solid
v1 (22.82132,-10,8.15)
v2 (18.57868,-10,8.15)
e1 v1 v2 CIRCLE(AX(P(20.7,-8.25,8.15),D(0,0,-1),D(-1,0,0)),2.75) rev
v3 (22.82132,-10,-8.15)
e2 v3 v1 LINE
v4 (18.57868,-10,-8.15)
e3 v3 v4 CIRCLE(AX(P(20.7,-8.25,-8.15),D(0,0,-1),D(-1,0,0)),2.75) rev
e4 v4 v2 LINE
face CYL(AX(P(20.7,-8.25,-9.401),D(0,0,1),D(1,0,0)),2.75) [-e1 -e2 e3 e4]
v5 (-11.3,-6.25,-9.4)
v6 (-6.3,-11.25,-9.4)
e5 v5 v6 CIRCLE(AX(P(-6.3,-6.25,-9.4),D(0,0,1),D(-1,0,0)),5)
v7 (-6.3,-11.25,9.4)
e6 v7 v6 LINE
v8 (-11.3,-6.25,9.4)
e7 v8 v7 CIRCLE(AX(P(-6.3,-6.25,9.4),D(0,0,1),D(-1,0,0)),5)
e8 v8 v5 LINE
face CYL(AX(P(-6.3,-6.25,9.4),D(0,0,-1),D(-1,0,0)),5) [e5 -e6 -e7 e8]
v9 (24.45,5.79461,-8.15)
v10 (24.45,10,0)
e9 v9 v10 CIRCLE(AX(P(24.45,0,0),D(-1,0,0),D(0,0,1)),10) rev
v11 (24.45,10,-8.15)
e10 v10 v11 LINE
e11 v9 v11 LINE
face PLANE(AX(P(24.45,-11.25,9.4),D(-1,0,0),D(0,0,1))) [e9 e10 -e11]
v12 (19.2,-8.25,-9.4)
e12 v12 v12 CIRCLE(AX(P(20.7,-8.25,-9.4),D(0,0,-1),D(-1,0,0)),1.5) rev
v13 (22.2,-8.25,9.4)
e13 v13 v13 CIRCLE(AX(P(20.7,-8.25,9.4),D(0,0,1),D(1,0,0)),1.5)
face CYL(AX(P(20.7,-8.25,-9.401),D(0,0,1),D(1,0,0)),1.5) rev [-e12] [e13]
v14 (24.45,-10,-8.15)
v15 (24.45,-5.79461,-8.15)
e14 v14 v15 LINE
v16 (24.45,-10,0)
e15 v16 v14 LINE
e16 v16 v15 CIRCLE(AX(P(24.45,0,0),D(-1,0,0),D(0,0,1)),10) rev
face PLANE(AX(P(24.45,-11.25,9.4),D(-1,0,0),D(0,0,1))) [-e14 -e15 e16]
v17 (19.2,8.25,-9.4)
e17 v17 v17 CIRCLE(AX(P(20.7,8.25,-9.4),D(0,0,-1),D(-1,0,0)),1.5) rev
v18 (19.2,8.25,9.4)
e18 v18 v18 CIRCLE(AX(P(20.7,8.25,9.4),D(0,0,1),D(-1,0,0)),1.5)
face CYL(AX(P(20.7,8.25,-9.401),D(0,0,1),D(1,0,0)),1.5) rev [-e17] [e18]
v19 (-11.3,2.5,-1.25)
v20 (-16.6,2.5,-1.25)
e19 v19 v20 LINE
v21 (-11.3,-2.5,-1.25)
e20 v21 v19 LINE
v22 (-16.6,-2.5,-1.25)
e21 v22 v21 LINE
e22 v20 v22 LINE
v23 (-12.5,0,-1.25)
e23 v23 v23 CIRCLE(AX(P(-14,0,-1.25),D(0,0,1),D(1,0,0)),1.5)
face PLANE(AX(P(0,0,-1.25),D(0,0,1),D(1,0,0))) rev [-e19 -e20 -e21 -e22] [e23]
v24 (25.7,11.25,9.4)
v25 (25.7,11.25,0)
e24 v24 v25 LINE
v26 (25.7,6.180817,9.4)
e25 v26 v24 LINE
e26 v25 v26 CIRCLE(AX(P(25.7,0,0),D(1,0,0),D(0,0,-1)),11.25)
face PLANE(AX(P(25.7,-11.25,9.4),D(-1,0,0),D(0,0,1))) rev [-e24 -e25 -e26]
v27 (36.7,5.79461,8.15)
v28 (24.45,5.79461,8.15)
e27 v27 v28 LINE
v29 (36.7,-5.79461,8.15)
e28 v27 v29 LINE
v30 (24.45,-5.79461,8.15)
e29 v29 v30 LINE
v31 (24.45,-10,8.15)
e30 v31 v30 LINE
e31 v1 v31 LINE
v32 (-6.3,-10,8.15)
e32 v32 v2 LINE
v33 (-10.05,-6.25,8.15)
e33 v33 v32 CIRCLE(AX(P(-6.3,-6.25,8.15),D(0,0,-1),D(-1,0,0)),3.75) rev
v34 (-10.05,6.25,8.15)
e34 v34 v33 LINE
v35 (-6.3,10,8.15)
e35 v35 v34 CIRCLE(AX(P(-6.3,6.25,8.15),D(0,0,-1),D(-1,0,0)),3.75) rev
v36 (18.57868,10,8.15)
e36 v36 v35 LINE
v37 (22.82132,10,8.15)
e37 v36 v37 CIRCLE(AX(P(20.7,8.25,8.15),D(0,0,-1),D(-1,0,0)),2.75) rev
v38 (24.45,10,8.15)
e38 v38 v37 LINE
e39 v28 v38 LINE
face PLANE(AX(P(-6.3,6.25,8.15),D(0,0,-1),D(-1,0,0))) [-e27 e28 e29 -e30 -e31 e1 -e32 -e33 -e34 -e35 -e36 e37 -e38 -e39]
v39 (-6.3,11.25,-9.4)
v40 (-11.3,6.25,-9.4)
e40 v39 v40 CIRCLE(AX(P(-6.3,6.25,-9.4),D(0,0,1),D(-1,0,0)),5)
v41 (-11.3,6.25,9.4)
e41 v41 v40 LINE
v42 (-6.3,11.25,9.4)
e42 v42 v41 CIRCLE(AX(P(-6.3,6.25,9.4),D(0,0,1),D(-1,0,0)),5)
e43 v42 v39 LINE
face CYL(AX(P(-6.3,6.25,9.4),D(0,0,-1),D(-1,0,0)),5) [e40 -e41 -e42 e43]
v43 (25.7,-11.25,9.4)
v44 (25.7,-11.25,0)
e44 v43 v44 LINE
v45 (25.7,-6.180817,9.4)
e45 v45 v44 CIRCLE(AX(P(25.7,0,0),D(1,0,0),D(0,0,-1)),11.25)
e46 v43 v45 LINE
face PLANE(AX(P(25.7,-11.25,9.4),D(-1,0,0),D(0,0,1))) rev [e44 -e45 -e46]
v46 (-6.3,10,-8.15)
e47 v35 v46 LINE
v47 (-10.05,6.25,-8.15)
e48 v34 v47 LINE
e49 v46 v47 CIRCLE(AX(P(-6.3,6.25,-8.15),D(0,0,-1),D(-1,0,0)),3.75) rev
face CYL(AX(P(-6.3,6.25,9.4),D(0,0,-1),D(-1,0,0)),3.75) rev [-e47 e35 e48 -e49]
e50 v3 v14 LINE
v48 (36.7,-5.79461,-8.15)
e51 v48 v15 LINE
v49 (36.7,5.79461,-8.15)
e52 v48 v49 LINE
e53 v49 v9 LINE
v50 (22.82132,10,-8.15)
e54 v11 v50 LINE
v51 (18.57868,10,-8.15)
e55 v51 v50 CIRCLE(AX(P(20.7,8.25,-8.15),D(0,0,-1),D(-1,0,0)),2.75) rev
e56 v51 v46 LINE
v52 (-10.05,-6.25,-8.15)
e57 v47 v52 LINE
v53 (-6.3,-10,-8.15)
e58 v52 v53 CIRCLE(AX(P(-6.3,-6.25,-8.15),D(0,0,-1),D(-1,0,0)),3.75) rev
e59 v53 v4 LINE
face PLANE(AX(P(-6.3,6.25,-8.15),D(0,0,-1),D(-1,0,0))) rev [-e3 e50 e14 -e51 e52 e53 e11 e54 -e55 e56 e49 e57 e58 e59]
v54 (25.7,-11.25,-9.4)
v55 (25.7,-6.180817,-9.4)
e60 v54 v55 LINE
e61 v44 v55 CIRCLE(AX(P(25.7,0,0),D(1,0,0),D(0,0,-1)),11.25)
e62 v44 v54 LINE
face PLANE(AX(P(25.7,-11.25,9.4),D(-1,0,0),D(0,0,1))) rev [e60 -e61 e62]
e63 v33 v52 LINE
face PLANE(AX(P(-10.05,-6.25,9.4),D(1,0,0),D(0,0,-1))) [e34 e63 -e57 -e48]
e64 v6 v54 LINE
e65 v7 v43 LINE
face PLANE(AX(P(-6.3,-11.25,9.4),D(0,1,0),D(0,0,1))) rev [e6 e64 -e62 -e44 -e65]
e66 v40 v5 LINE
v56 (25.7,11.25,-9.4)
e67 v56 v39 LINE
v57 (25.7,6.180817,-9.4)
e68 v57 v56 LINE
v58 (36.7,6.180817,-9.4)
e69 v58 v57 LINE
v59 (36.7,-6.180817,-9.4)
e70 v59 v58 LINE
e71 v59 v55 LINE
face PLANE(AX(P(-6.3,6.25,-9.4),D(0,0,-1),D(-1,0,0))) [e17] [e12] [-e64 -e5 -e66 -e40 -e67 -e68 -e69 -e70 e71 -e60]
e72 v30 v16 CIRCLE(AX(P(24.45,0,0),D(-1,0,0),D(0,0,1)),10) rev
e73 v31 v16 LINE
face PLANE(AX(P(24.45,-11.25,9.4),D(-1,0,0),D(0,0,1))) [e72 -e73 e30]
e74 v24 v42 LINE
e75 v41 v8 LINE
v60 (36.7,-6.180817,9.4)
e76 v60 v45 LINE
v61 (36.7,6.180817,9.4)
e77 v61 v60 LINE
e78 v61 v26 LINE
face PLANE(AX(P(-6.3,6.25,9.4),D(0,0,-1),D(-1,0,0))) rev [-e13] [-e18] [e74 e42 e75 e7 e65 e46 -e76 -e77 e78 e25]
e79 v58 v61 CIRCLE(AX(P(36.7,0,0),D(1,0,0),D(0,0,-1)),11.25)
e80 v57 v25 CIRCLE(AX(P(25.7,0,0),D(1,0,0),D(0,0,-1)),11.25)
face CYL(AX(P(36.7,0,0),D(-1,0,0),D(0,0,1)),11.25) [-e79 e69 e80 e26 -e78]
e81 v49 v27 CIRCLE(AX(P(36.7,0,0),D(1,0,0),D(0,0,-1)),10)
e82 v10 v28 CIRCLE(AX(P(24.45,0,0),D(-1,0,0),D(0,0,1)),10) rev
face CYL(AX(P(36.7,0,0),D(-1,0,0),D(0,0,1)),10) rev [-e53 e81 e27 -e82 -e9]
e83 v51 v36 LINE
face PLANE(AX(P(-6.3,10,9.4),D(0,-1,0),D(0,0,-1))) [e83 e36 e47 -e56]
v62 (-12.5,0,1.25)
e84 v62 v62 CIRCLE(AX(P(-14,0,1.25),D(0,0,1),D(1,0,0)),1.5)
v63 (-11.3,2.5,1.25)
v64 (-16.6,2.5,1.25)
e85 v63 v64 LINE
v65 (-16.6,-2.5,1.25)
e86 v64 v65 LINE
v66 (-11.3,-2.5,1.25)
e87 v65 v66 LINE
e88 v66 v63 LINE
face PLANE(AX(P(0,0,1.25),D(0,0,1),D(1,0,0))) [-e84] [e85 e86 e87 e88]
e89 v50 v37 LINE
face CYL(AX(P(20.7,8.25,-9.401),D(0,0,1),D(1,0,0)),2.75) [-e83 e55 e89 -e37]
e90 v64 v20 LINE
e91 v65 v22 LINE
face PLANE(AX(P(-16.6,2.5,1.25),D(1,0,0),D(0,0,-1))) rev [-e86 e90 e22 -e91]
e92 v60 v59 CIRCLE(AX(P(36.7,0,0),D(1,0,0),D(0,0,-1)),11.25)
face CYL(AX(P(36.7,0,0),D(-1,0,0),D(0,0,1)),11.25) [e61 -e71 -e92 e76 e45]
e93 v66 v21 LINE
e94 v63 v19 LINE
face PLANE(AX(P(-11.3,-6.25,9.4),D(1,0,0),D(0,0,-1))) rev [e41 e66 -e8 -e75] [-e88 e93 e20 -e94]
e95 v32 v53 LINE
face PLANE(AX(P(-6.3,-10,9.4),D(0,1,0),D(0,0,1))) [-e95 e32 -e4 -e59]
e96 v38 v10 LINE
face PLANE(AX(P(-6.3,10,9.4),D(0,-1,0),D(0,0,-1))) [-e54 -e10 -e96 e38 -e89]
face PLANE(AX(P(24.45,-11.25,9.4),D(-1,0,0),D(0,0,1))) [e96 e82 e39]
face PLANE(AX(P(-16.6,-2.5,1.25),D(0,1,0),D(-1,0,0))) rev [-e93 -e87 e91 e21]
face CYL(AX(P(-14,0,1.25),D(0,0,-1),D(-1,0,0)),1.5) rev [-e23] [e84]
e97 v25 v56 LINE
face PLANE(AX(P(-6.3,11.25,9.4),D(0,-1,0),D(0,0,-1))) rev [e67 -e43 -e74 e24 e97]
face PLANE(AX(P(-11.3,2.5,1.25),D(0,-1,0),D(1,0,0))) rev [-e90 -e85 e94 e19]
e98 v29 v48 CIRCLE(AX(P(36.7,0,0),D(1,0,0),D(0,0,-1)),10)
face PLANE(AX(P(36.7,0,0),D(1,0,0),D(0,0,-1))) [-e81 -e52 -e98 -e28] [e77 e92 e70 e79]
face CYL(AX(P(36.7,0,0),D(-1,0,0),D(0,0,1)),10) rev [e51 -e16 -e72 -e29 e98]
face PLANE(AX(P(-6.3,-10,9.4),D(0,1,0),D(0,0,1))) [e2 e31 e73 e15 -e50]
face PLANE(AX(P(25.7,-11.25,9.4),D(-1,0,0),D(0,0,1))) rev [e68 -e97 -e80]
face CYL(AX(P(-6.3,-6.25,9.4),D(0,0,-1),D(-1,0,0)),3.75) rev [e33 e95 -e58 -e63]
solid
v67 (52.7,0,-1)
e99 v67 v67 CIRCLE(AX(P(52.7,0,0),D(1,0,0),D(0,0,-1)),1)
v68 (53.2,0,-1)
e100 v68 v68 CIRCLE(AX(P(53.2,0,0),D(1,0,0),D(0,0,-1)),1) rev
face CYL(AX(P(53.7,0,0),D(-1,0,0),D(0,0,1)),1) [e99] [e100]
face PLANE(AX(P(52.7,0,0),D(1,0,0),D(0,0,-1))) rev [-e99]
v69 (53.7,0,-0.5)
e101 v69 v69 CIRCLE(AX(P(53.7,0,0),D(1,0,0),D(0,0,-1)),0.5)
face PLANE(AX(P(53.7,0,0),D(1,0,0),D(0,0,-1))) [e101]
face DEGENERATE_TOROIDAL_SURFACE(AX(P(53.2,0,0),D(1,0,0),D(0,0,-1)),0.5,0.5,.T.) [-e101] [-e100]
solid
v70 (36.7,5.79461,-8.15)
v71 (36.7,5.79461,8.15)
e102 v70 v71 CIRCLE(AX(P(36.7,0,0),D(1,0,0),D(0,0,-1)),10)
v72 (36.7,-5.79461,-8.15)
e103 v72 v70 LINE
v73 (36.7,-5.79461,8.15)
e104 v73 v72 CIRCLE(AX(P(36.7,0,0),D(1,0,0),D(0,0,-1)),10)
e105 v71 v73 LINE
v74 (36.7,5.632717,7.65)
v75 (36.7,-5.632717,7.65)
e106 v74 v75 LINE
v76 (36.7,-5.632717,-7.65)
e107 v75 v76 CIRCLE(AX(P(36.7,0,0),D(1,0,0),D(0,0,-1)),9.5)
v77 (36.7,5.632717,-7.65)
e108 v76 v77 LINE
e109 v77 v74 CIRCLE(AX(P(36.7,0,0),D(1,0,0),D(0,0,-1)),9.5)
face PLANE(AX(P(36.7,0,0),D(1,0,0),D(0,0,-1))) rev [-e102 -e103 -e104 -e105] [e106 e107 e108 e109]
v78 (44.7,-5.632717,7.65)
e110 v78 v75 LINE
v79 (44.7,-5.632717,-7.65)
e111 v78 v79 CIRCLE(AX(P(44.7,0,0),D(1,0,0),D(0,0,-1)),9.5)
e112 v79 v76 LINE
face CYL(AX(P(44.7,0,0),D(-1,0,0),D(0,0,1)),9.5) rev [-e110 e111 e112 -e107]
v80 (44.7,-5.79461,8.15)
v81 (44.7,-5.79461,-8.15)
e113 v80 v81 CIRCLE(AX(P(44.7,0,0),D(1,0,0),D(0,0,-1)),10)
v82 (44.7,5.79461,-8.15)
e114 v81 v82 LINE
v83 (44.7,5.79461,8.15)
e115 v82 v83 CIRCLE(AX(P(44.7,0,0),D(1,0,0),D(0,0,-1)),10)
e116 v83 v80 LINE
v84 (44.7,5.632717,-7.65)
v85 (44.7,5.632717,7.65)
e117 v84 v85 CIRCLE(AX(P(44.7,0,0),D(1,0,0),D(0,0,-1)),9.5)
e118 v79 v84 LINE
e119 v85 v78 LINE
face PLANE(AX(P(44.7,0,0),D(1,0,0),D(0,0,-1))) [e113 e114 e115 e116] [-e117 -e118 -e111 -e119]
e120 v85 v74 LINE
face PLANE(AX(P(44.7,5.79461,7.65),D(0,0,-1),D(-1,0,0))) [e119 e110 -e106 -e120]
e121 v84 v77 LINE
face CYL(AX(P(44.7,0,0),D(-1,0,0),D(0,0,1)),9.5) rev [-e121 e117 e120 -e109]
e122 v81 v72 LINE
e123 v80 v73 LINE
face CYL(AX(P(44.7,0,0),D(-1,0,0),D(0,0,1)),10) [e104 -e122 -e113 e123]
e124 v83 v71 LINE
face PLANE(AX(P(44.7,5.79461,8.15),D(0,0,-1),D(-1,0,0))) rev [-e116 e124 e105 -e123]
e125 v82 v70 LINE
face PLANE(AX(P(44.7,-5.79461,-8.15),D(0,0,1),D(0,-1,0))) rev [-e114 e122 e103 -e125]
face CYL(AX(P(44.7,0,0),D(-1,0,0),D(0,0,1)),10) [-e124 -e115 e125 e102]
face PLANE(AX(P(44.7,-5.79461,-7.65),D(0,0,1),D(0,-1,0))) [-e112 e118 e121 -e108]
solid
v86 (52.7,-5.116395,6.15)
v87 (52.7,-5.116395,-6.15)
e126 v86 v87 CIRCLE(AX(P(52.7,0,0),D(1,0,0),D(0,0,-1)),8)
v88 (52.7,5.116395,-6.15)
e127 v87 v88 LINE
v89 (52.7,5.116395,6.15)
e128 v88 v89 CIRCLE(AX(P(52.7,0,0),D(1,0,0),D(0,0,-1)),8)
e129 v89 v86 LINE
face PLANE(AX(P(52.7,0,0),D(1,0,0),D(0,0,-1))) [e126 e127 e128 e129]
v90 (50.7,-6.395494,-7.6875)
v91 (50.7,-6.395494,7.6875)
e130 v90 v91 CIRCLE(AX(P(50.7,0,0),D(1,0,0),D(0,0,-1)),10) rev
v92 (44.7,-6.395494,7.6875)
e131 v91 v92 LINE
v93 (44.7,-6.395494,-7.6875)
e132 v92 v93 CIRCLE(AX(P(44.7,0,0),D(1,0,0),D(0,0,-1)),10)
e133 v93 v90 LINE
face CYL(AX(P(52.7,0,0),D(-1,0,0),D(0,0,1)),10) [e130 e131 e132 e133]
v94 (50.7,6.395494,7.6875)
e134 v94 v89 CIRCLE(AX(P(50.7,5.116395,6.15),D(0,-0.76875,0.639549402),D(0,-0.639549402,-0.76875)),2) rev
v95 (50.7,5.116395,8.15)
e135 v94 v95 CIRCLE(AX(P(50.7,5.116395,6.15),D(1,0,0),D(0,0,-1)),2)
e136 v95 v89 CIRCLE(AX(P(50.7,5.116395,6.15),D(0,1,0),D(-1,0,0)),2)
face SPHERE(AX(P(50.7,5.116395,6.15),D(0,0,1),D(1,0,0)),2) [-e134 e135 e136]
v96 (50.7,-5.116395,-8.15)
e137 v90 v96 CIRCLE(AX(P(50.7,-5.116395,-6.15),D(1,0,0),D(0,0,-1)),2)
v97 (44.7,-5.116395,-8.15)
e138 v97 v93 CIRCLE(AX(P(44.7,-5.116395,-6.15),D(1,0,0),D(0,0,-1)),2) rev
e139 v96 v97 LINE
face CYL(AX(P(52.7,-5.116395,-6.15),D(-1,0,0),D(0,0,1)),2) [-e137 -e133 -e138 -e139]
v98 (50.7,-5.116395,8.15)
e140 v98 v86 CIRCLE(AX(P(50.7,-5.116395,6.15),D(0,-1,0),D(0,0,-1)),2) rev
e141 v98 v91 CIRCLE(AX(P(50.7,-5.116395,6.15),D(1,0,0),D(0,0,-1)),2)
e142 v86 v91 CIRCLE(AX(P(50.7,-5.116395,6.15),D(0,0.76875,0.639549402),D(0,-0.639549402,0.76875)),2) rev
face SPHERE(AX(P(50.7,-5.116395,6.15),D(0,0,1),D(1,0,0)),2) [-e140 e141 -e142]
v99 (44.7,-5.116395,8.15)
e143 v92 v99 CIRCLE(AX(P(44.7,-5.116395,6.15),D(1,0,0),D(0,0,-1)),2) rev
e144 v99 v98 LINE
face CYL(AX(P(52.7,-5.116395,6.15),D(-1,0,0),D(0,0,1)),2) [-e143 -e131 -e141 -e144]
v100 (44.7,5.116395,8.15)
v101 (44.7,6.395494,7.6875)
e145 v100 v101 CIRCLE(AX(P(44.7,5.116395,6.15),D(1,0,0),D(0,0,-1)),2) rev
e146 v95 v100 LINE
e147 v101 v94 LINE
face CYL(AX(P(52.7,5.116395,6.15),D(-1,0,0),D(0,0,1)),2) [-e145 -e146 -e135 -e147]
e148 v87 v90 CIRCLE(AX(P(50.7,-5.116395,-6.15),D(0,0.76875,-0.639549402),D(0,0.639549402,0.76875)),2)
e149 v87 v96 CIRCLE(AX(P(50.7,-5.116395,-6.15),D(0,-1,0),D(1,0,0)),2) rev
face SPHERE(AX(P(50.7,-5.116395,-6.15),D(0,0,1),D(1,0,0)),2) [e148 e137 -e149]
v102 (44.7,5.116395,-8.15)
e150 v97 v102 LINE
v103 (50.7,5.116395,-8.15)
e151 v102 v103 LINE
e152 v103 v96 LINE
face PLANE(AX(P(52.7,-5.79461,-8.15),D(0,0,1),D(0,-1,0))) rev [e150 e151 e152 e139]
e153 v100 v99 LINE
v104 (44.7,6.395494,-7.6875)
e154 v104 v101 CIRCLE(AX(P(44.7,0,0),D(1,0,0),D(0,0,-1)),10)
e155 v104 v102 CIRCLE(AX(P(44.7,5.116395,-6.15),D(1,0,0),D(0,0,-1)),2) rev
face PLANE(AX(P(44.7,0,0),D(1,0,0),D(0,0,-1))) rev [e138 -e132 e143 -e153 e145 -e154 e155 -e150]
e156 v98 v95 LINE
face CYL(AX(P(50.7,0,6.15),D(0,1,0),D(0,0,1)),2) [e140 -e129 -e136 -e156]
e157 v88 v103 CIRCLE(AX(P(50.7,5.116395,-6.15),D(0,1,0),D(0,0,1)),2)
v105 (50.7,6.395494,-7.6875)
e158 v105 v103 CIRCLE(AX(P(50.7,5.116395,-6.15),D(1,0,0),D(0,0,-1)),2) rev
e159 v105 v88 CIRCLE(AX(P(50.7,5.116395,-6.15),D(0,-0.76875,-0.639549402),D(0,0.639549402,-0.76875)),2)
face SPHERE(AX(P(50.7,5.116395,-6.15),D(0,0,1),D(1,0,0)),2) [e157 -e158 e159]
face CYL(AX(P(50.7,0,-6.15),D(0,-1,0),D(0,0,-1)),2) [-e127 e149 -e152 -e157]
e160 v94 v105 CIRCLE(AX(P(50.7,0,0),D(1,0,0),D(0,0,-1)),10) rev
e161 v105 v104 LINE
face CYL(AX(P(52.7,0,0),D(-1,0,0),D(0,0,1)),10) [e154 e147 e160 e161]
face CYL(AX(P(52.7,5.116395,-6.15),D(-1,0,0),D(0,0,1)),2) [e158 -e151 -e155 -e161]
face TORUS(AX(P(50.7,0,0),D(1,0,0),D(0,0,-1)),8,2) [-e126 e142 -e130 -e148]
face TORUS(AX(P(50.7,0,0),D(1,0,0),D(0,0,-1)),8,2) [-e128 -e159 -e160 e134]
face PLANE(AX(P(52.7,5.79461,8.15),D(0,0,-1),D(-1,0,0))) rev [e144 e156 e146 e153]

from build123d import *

# Parameters (mm, degrees)
YELLOW_BODY_DEPTH  = 9.4
SKETCH8_W          = 5.3
SKETCH8_H          = 5
SKETCH8_R          = 1.5
LUG_DEPTH          = 1.25
HOLES_REACH        = 35.771
SKETCH9_R          = 1.5
MOTOR_SOCKET_DEPTH = 11
SHELL1_START       = -6.3
SHELL1_OUTLINE_W   = 20
SHELL1_OUTLINE_H   = 16.3
SHELL1_DEPTH       = 24.25
SHELL1_START_2     = 23.45
SHELL1_2_DEPTH     = 13.25
SHELL1_3_DEPTH     = 1
SHELL1_START_3     = -8.15
SHELL1_4_DEPTH     = 16.3
MOTOR_BODY_DEPTH   = 8
MOTOR_END_DEPTH    = 8
FILLET1_R          = 2
SKETCH5_R          = 1
MOTOR_SHAFT_DEPTH  = 1
FILLET2_R          = 0.5


with BuildPart() as part:
    # Sketch1 → Yellow Body (new, symmetric)
    with BuildSketch(Plane.XY):
        with BuildLine():
            Line((-6.3, -11.25), (25.7, -11.25))
            Line((25.7, -11.25), (25.7, 11.25))
            Line((25.7, 11.25), (-6.3, 11.25))
            ThreePointArc((-6.3, 11.25), (-9.835534, 9.785534), (-11.3, 6.25))
            Line((-11.3, 6.25), (-11.3, -6.25))
            ThreePointArc((-11.3, -6.25), (-9.835534, -9.785534), (-6.3, -11.25))
        make_face()
    extrude(amount=YELLOW_BODY_DEPTH, both=True)

    # Sketch8 → Lug (add, symmetric)
    with BuildSketch(Plane.XY):
        with Locations((-13.95, 0)):
            Rectangle(SKETCH8_W, SKETCH8_H)
        with Locations((-14, 0)):
            Circle(SKETCH8_R, mode=Mode.SUBTRACT)
    extrude(amount=LUG_DEPTH, both=True)

    # Sketch9 → Holes (cut, up to next)
    with BuildSketch(Plane.XY.offset(9.4), mode=Mode.PRIVATE) as holes_sk1:
        with Locations((20.7, -8.25)):
            Circle(SKETCH9_R)
    holes_tool1 = extrude(holes_sk1.sketch, amount=-HOLES_REACH, mode=Mode.PRIVATE) & part.part
    # Sketch9 → Holes (cut, up to next)
    with BuildSketch(Plane.XY.offset(9.4), mode=Mode.PRIVATE) as holes_sk2:
        with Locations(Location((20.7, 8.25, 0), (0, 0, 180))):
            Circle(SKETCH9_R)
    holes_tool2 = extrude(holes_sk2.sketch, amount=-HOLES_REACH, mode=Mode.PRIVATE) & part.part
    add(holes_tool1.solids().sort_by_distance((20.7, -8.25, 9.4))[0], mode=Mode.SUBTRACT)
    add(holes_tool2.solids().sort_by_distance((20.7, 8.25, 9.4))[0], mode=Mode.SUBTRACT)

    # Sketch2 → Motor Socket (add)
    with BuildSketch(Plane(origin=(25.7, 0, 0), x_dir=(0, 0, -1), z_dir=(1, 0, 0))):
        with BuildLine():
            Line((9.4, -6.180817), (9.4, 6.180817))
            ThreePointArc((9.4, 6.180817), (0, 11.25), (-9.4, 6.180817))
            Line((-9.4, 6.180817), (-9.4, -6.180817))
            ThreePointArc((-9.4, -6.180817), (0, -11.25), (9.4, -6.180817))
        make_face()
    extrude(amount=MOTOR_SOCKET_DEPTH)

    # Shell1: read off the stored shape, not the designer's step
    # Shell1 outline → Shell1 (cut)
    with BuildSketch(Plane.YZ.offset(SHELL1_START)):
        Rectangle(SHELL1_OUTLINE_W, SHELL1_OUTLINE_H)
    extrude(amount=SHELL1_DEPTH, mode=Mode.SUBTRACT)

    # Shell1 2 outline → Shell1 2 (cut)
    with BuildSketch(Plane.YZ.offset(SHELL1_START_2)):
        with BuildLine():
            ThreePointArc((-5.79461, 8.15), (-10, 0), (-5.79461, -8.15))
            Line((-5.79461, -8.15), (5.79461, -8.15))
            ThreePointArc((5.79461, -8.15), (10, 0), (5.79461, 8.15))
            Line((5.79461, 8.15), (-5.79461, 8.15))
        make_face()
    extrude(amount=SHELL1_2_DEPTH, mode=Mode.SUBTRACT)

    # Shell1 3 outline → Shell1 3 (cut)
    with BuildSketch(Plane.YZ.offset(SHELL1_START_2)):
        with BuildLine():
            Line((-10, 0), (-10, -8.15))
            Line((-10, -8.15), (-5.79461, -8.15))
            ThreePointArc((-5.79461, -8.15), (-8.886678, -4.585515), (-10, 0))
        make_face()
        with BuildLine():
            Line((-10, 8.15), (-10, 0))
            ThreePointArc((-10, 0), (-8.886678, 4.585515), (-5.79461, 8.15))
            Line((-5.79461, 8.15), (-10, 8.15))
        make_face()
        with BuildLine():
            ThreePointArc((10, 0), (8.886678, -4.585515), (5.79461, -8.15))
            Line((5.79461, -8.15), (10, -8.15))
            Line((10, -8.15), (10, 0))
        make_face()
        with BuildLine():
            Line((10, 8.15), (5.79461, 8.15))
            ThreePointArc((5.79461, 8.15), (8.886678, 4.585515), (10, 0))
            Line((10, 0), (10, 8.15))
        make_face()
    extrude(amount=SHELL1_3_DEPTH, mode=Mode.SUBTRACT)

    # Shell1 4 outline → Shell1 4 (cut)
    with BuildSketch(Plane.XY.offset(SHELL1_START_3)):
        with BuildLine():
            ThreePointArc((22.82132, 10), (23.288062, 9.17975), (23.45, 8.25))
            Line((23.45, 8.25), (23.45, 10))
            Line((23.45, 10), (22.82132, 10))
        make_face()
        with BuildLine():
            ThreePointArc((17.95, -8.25), (20.7, -5.5), (23.45, -8.25))
            Line((23.45, -8.25), (23.45, 8.25))
            ThreePointArc((23.45, 8.25), (20.7, 5.5), (17.95, 8.25))
            Line((17.95, 8.25), (17.95, -8.25))
        make_face()
        with BuildLine():
            Line((22.82132, -10), (23.45, -10))
            Line((23.45, -10), (23.45, -8.25))
            ThreePointArc((23.45, -8.25), (23.288062, -9.17975), (22.82132, -10))
        make_face()
        with BuildLine():
            ThreePointArc((18.57868, -10), (18.111938, -9.17975), (17.95, -8.25))
            Line((17.95, -8.25), (17.95, -10))
            Line((17.95, -10), (18.57868, -10))
        make_face()
        with BuildLine():
            Line((17.95, 10), (17.95, 8.25))
            ThreePointArc((17.95, 8.25), (18.111938, 9.17975), (18.57868, 10))
            Line((18.57868, 10), (17.95, 10))
        make_face()
        with BuildLine():
            ThreePointArc((-10.05, -6.25), (-8.95165, -8.90165), (-6.3, -10))
            Line((-6.3, -10), (-6.3, 10))
            ThreePointArc((-6.3, 10), (-8.95165, 8.90165), (-10.05, 6.25))
            Line((-10.05, 6.25), (-10.05, -6.25))
        make_face()
    extrude(amount=SHELL1_4_DEPTH, mode=Mode.SUBTRACT)


with BuildPart() as body_2:
    # Sketch3 → Motor Body (new body)
    with BuildSketch(Plane(origin=(36.7, 0, 0), x_dir=(0, 0, -1), z_dir=(1, 0, 0))):
        with BuildLine():
            Line((-8.15, 5.79461), (-8.15, -5.79461))
            ThreePointArc((-8.15, -5.79461), (0, -10), (8.15, -5.79461))
            Line((8.15, -5.79461), (8.15, 5.79461))
            ThreePointArc((8.15, 5.79461), (0, 10), (-8.15, 5.79461))
        make_face()
        with BuildLine():
            Line((-7.65, 5.632717), (-7.65, -5.632717))
            ThreePointArc((-7.65, -5.632717), (0, -9.5), (7.65, -5.632717))
            Line((7.65, -5.632717), (7.65, 5.632717))
            ThreePointArc((7.65, 5.632717), (0, 9.5), (-7.65, 5.632717))
        make_face(mode=Mode.SUBTRACT)
    extrude(amount=MOTOR_BODY_DEPTH)


with BuildPart() as body_3:
    # Sketch4 → Motor End (new body)
    with BuildSketch(Plane(origin=(44.7, 0, 0), x_dir=(0, 0, -1), z_dir=(1, 0, 0))):
        with BuildLine():
            Line((8.15, -5.79461), (8.15, 5.79461))
            ThreePointArc((8.15, 5.79461), (0, 10), (-8.15, 5.79461))
            Line((-8.15, 5.79461), (-8.15, -5.79461))
            ThreePointArc((-8.15, -5.79461), (0, -10), (8.15, -5.79461))
        make_face()
    extrude(amount=MOTOR_END_DEPTH)

    # Fillet1
    fillet1_edges = [body_3.edges().sort_by_distance(p)[0] for p in [
        (52.7, 10, 0),
        (52.7, 0, 8.15),
        (52.7, -10, 0),
        (52.7, 0, -8.15),
        (48.7, -5.79461, 8.15),
        (48.7, 5.79461, 8.15),
        (48.7, 5.79461, -8.15),
        (48.7, -5.79461, -8.15),
    ]]
    fillet(fillet1_edges, radius=FILLET1_R)


with BuildPart() as body_4:
    # Sketch5 → Motor Shaft (new body)
    with BuildSketch(Plane(origin=(52.7, 0, 0), x_dir=(0, 0, -1), z_dir=(1, 0, 0))):
        Circle(SKETCH5_R)
    extrude(amount=MOTOR_SHAFT_DEPTH)

    # Fillet2
    fillet2_edges = [body_4.edges().sort_by_distance(p)[0] for p in [
        (53.7, 0, 1),
    ]]
    fillet(fillet2_edges, radius=FILLET2_R)


solid = Compound([part.part, body_2.part, body_3.part, body_4.part])
